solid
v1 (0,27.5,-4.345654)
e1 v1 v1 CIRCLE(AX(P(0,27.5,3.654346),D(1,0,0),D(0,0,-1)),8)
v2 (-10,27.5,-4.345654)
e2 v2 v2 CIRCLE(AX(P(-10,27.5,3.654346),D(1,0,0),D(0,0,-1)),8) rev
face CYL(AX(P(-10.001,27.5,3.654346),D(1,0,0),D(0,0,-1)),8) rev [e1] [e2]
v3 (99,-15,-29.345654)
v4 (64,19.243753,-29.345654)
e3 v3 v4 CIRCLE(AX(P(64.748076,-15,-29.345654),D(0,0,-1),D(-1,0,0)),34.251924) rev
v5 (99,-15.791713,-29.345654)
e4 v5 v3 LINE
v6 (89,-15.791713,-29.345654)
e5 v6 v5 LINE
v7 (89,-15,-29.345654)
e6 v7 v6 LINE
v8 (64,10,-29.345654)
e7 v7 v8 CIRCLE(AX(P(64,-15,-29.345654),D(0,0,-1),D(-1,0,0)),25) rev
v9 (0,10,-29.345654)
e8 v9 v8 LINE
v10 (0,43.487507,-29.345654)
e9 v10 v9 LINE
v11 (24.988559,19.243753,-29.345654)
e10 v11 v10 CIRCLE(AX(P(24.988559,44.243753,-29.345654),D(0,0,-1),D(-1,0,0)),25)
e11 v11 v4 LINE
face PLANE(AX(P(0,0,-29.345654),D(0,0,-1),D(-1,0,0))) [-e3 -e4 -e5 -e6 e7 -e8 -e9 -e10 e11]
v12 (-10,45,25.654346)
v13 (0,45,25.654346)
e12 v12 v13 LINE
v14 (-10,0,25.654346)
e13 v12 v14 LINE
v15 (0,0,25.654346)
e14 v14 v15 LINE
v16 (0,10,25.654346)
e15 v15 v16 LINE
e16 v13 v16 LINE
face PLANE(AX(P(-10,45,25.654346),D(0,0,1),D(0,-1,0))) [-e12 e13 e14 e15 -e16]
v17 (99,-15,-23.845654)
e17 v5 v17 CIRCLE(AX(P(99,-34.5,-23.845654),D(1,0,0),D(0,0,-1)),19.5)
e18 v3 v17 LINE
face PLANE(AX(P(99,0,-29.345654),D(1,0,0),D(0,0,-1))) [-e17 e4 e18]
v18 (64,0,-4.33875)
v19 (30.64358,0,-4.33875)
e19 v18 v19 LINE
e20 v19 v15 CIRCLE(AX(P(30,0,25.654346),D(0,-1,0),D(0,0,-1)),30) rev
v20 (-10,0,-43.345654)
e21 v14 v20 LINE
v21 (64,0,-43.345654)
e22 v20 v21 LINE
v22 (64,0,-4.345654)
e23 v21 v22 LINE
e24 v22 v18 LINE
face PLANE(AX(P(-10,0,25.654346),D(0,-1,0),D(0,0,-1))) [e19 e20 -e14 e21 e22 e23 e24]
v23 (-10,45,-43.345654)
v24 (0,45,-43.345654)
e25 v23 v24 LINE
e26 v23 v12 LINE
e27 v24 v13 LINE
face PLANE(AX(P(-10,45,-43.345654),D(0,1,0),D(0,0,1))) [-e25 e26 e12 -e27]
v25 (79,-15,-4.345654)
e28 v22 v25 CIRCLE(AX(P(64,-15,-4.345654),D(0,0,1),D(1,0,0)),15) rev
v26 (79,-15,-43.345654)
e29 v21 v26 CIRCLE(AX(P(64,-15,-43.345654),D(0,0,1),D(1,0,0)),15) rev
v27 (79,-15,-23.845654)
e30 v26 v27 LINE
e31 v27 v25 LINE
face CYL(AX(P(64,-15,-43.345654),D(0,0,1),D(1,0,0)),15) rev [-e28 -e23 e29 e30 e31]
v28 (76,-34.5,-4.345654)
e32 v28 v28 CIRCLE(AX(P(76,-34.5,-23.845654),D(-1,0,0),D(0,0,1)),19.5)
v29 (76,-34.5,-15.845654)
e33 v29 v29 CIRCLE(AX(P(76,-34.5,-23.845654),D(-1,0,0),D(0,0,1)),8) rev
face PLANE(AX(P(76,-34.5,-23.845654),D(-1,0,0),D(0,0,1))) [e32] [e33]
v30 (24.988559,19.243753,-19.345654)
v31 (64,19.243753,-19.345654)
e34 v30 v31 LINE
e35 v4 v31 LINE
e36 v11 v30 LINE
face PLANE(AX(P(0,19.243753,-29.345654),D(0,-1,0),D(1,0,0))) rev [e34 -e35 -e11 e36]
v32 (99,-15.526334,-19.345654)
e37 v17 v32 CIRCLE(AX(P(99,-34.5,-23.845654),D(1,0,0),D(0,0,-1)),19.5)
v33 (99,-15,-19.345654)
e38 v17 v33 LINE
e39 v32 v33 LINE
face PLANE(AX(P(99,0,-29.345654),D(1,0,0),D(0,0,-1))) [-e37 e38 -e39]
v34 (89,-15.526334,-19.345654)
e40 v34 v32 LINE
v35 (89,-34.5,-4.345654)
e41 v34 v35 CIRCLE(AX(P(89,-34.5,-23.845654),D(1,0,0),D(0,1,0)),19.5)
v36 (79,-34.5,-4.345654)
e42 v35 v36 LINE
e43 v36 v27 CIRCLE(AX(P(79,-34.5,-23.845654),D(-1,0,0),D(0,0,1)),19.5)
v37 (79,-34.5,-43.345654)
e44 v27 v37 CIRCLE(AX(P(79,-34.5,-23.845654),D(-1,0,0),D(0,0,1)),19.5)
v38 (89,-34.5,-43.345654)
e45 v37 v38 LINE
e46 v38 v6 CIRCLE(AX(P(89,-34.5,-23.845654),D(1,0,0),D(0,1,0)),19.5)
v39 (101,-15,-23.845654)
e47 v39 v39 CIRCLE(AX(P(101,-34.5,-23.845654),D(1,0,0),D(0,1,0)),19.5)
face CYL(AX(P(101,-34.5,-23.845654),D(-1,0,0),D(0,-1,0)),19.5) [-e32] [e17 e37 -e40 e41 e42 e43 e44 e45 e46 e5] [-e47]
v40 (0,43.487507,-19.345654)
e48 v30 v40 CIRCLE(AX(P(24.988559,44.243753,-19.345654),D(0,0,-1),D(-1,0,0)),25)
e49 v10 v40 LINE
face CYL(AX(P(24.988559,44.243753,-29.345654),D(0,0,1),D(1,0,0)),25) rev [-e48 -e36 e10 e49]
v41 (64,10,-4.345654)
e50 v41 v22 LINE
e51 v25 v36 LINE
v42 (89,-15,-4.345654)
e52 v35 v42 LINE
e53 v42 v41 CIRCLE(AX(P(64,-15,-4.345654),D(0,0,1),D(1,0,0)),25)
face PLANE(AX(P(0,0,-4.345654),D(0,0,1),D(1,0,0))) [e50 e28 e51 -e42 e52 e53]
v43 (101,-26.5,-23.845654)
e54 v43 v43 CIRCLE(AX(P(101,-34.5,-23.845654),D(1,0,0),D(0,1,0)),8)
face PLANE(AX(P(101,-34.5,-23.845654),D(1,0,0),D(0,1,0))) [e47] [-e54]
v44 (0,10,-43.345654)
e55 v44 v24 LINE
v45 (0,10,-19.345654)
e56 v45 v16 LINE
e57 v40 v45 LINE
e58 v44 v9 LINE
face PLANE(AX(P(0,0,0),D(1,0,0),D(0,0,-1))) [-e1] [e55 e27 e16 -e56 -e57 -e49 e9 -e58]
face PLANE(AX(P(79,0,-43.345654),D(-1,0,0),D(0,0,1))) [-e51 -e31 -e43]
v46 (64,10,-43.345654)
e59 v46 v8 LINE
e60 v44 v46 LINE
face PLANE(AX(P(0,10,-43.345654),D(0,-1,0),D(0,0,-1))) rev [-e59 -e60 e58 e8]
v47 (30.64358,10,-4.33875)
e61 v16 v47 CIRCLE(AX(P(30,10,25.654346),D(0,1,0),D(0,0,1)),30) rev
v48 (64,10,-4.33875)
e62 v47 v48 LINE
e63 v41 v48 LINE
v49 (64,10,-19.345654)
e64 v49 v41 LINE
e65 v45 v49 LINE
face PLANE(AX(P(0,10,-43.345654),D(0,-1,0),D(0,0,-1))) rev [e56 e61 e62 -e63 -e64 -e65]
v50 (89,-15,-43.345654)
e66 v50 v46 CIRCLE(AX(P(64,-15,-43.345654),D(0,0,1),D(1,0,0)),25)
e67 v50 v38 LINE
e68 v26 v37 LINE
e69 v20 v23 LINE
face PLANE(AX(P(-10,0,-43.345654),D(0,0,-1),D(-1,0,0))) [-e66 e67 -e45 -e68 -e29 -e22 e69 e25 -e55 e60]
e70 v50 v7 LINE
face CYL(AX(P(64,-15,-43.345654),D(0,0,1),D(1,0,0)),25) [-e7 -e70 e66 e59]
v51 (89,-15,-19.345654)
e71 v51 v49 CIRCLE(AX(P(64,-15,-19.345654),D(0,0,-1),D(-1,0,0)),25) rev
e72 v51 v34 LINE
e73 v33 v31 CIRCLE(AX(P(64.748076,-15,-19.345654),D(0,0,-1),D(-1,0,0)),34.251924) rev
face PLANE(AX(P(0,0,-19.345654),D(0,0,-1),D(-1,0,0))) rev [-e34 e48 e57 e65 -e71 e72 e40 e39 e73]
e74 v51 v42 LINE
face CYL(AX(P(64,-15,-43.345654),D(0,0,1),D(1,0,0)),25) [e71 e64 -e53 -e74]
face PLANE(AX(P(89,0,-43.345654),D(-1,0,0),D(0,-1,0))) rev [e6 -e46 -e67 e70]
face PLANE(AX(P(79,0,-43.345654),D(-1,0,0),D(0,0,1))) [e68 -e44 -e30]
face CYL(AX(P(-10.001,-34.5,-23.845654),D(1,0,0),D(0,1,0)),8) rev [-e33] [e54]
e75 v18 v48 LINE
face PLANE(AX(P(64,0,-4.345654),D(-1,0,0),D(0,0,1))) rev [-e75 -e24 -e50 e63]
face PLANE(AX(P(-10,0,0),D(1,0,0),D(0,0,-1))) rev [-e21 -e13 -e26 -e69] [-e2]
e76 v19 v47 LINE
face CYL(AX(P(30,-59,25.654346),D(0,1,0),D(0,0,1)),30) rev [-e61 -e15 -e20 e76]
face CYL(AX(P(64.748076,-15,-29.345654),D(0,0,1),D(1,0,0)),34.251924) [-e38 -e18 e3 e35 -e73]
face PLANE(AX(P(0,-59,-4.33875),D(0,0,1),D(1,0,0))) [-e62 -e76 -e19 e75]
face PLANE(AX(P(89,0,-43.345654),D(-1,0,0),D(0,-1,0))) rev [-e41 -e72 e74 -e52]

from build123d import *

# Parameters (mm, degrees)
SKETCH1_W           = 69
SKETCH1_H           = 45
BOSS_EXTRUDE1_DEPTH = 10
BOSS_EXTRUDE2_DEPTH = 69
CUT_EXTRUDE1_DEPTH  = 69
CUT_EXTRUDE2_DEPTH  = 30
SKETCH6_R           = 19.5
BOSS_EXTRUDE3_DEPTH = 12
CUT_EXTRUDE3_START  = -12
CUT_EXTRUDE3_DEPTH  = 12
BOSS_EXTRUDE4_START = 3
SKETCH8_R           = 19.5
BOSS_EXTRUDE4_DEPTH = 3
CUT_EXTRUDE4_REACH  = 124.458
SKETCH9_R           = 8
BOSS_EXTRUDE5_DEPTH = 5
CUT_EXTRUDE5_REACH  = 132.828
SKETCH14_R          = 8


with BuildPart() as part:
    # Sketch1 → Boss-Extrude1 (new body)
    with BuildSketch(Plane(origin=(0, 0, 0), x_dir=(0, 0, -1), z_dir=(1, 0, 0))):
        with Locations((8.845653905, 22.5)):
            Rectangle(SKETCH1_W, SKETCH1_H)
    extrude(amount=-BOSS_EXTRUDE1_DEPTH)

    # Sketch2 → Boss-Extrude2 (add)
    with BuildSketch(Plane.XY.offset(25.654346095)):
        with BuildLine():
            Line((64, 10), (0, 10))
            Line((0, 10), (0, 0))
            Line((0, 0), (44.854374374, 0))
            Line((44.854374374, 0), (64, 0))
            ThreePointArc((64, 0), (74.606601718, -4.393398282), (79, -15))
            Line((79, -15), (79, -55.367791419))
            Line((79, -55.367791419), (89, -55.367791419))
            Line((89, -55.367791419), (89, -15))
            ThreePointArc((89, -15), (81.67766953, 2.67766953), (64, 10))
        make_face()
    extrude(amount=-BOSS_EXTRUDE2_DEPTH)

    # Sketch4 → Cut-Extrude1 (cut)
    with BuildSketch(Plane(origin=(0, 10, 0), x_dir=(1, 0, 0), z_dir=(0, 1, 0))):
        with BuildLine():
            ThreePointArc((30.643579789, 4.338749862), (9.015569982, -4.21481026), (0, -25.654346095))
            Line((0, -25.654346095), (64, -25.654346095))
            Line((64, -25.654346095), (64, 4.338749862))
            Line((64, 4.338749862), (30.643579789, 4.338749862))
        make_face()
    extrude(amount=-CUT_EXTRUDE1_DEPTH, mode=Mode.SUBTRACT)

    # Sketch5 → Cut-Extrude2 (cut)
    with BuildSketch(Plane.XY.offset(25.654346095)):
        with BuildLine():
            Line((79, -15), (79, -55.367791419))
            Line((79, -55.367791419), (89, -55.367791419))
            Line((89, -55.367791419), (89, -15))
            ThreePointArc((89, -15), (81.67766953, 2.67766953), (64, 10))
            Line((64, 10), (64, 0))
            ThreePointArc((64, 0), (74.606601718, -4.393398282), (79, -15))
        make_face()
    extrude(amount=-CUT_EXTRUDE2_DEPTH, mode=Mode.SUBTRACT)

    # Sketch6 → Boss-Extrude3 (add)
    with BuildSketch(Plane(origin=(89, 0, 0), x_dir=(0, 0, -1), z_dir=(1, 0, 0))):
        with Locations((23.845653905, -34.5)):
            Circle(SKETCH6_R)
    extrude(amount=BOSS_EXTRUDE3_DEPTH)

    # Sketch7 → Cut-Extrude3 (cut)
    with BuildSketch(Plane(origin=(89, 0, 0), x_dir=(0, 0, -1), z_dir=(1, 0, 0)).offset(CUT_EXTRUDE3_START)):
        with BuildLine():
            Line((4.345653905, -34.5), (4.345653905, -55.367791419))
            Line((4.345653905, -55.367791419), (43.345653905, -55.367791419))
            Line((43.345653905, -55.367791419), (43.345653905, -34.5))
            ThreePointArc((43.345653905, -34.5), (23.845653905, -54), (4.345653905, -34.5))
        make_face()
    extrude(amount=CUT_EXTRUDE3_DEPTH, mode=Mode.SUBTRACT)

    # Sketch8 → Boss-Extrude4 (add)
    with BuildSketch(Plane.ZY.offset(-79).offset(BOSS_EXTRUDE4_START)):
        with Locations((-23.845653905, -34.5)):
            Circle(SKETCH8_R)
    extrude(amount=-BOSS_EXTRUDE4_DEPTH)

    # Sketch9 → Cut-Extrude4 (cut, up to next)
    with BuildSketch(Plane(origin=(0, 0, 0), x_dir=(0, 0, -1), z_dir=(1, 0, 0)), mode=Mode.PRIVATE) as cut_extrude4_sk1:
        with Locations((-3.654346095, 27.5)):
            Circle(SKETCH9_R)
    cut_extrude4_tool1 = extrude(cut_extrude4_sk1.sketch, amount=-CUT_EXTRUDE4_REACH, mode=Mode.PRIVATE) & part.part
    add(cut_extrude4_tool1.solids().sort_by_distance((0, 27.5, 3.654346))[0], mode=Mode.SUBTRACT)

    # Sketch13 → Boss-Extrude5 (add, symmetric)
    with BuildSketch(Plane(origin=(0, 0, -24.345653905), x_dir=(-1, 0, 0), z_dir=(0, 0, -1))):
        with BuildLine():
            Line((0, 10), (0, 43.487506986))
            ThreePointArc((0, 43.487506986), (-7.58031637, 26.300702433), (-24.988559207, 19.243753493))
            Line((-24.988559207, 19.243753493), (-64, 19.243753493))
            ThreePointArc((-64, 19.243753493), (-88.701898796, 9.482823843), (-99, -15))
            Line((-99, -15), (-99, -34.5))
            Line((-99, -34.5), (-89, -34.5))
            Line((-89, -34.5), (-89, -15))
            ThreePointArc((-89, -15), (-81.67766953, 2.67766953), (-64, 10))
            Line((-64, 10), (0, 10))
        make_face()
    extrude(amount=BOSS_EXTRUDE5_DEPTH, both=True)

    # Sketch14 → Cut-Extrude5 (cut, up to next)
    with BuildSketch(Plane(origin=(101, 0, 0), x_dir=(0, 0, -1), z_dir=(1, 0, 0)), mode=Mode.PRIVATE) as cut_extrude5_sk1:
        with Locations((23.845653905, -34.5)):
            Circle(SKETCH14_R)
    cut_extrude5_tool1 = extrude(cut_extrude5_sk1.sketch, amount=-CUT_EXTRUDE5_REACH, mode=Mode.PRIVATE) & part.part
    add(cut_extrude5_tool1.solids().sort_by_distance((101, -34.5, -23.845654))[0], mode=Mode.SUBTRACT)


solid = part.part
